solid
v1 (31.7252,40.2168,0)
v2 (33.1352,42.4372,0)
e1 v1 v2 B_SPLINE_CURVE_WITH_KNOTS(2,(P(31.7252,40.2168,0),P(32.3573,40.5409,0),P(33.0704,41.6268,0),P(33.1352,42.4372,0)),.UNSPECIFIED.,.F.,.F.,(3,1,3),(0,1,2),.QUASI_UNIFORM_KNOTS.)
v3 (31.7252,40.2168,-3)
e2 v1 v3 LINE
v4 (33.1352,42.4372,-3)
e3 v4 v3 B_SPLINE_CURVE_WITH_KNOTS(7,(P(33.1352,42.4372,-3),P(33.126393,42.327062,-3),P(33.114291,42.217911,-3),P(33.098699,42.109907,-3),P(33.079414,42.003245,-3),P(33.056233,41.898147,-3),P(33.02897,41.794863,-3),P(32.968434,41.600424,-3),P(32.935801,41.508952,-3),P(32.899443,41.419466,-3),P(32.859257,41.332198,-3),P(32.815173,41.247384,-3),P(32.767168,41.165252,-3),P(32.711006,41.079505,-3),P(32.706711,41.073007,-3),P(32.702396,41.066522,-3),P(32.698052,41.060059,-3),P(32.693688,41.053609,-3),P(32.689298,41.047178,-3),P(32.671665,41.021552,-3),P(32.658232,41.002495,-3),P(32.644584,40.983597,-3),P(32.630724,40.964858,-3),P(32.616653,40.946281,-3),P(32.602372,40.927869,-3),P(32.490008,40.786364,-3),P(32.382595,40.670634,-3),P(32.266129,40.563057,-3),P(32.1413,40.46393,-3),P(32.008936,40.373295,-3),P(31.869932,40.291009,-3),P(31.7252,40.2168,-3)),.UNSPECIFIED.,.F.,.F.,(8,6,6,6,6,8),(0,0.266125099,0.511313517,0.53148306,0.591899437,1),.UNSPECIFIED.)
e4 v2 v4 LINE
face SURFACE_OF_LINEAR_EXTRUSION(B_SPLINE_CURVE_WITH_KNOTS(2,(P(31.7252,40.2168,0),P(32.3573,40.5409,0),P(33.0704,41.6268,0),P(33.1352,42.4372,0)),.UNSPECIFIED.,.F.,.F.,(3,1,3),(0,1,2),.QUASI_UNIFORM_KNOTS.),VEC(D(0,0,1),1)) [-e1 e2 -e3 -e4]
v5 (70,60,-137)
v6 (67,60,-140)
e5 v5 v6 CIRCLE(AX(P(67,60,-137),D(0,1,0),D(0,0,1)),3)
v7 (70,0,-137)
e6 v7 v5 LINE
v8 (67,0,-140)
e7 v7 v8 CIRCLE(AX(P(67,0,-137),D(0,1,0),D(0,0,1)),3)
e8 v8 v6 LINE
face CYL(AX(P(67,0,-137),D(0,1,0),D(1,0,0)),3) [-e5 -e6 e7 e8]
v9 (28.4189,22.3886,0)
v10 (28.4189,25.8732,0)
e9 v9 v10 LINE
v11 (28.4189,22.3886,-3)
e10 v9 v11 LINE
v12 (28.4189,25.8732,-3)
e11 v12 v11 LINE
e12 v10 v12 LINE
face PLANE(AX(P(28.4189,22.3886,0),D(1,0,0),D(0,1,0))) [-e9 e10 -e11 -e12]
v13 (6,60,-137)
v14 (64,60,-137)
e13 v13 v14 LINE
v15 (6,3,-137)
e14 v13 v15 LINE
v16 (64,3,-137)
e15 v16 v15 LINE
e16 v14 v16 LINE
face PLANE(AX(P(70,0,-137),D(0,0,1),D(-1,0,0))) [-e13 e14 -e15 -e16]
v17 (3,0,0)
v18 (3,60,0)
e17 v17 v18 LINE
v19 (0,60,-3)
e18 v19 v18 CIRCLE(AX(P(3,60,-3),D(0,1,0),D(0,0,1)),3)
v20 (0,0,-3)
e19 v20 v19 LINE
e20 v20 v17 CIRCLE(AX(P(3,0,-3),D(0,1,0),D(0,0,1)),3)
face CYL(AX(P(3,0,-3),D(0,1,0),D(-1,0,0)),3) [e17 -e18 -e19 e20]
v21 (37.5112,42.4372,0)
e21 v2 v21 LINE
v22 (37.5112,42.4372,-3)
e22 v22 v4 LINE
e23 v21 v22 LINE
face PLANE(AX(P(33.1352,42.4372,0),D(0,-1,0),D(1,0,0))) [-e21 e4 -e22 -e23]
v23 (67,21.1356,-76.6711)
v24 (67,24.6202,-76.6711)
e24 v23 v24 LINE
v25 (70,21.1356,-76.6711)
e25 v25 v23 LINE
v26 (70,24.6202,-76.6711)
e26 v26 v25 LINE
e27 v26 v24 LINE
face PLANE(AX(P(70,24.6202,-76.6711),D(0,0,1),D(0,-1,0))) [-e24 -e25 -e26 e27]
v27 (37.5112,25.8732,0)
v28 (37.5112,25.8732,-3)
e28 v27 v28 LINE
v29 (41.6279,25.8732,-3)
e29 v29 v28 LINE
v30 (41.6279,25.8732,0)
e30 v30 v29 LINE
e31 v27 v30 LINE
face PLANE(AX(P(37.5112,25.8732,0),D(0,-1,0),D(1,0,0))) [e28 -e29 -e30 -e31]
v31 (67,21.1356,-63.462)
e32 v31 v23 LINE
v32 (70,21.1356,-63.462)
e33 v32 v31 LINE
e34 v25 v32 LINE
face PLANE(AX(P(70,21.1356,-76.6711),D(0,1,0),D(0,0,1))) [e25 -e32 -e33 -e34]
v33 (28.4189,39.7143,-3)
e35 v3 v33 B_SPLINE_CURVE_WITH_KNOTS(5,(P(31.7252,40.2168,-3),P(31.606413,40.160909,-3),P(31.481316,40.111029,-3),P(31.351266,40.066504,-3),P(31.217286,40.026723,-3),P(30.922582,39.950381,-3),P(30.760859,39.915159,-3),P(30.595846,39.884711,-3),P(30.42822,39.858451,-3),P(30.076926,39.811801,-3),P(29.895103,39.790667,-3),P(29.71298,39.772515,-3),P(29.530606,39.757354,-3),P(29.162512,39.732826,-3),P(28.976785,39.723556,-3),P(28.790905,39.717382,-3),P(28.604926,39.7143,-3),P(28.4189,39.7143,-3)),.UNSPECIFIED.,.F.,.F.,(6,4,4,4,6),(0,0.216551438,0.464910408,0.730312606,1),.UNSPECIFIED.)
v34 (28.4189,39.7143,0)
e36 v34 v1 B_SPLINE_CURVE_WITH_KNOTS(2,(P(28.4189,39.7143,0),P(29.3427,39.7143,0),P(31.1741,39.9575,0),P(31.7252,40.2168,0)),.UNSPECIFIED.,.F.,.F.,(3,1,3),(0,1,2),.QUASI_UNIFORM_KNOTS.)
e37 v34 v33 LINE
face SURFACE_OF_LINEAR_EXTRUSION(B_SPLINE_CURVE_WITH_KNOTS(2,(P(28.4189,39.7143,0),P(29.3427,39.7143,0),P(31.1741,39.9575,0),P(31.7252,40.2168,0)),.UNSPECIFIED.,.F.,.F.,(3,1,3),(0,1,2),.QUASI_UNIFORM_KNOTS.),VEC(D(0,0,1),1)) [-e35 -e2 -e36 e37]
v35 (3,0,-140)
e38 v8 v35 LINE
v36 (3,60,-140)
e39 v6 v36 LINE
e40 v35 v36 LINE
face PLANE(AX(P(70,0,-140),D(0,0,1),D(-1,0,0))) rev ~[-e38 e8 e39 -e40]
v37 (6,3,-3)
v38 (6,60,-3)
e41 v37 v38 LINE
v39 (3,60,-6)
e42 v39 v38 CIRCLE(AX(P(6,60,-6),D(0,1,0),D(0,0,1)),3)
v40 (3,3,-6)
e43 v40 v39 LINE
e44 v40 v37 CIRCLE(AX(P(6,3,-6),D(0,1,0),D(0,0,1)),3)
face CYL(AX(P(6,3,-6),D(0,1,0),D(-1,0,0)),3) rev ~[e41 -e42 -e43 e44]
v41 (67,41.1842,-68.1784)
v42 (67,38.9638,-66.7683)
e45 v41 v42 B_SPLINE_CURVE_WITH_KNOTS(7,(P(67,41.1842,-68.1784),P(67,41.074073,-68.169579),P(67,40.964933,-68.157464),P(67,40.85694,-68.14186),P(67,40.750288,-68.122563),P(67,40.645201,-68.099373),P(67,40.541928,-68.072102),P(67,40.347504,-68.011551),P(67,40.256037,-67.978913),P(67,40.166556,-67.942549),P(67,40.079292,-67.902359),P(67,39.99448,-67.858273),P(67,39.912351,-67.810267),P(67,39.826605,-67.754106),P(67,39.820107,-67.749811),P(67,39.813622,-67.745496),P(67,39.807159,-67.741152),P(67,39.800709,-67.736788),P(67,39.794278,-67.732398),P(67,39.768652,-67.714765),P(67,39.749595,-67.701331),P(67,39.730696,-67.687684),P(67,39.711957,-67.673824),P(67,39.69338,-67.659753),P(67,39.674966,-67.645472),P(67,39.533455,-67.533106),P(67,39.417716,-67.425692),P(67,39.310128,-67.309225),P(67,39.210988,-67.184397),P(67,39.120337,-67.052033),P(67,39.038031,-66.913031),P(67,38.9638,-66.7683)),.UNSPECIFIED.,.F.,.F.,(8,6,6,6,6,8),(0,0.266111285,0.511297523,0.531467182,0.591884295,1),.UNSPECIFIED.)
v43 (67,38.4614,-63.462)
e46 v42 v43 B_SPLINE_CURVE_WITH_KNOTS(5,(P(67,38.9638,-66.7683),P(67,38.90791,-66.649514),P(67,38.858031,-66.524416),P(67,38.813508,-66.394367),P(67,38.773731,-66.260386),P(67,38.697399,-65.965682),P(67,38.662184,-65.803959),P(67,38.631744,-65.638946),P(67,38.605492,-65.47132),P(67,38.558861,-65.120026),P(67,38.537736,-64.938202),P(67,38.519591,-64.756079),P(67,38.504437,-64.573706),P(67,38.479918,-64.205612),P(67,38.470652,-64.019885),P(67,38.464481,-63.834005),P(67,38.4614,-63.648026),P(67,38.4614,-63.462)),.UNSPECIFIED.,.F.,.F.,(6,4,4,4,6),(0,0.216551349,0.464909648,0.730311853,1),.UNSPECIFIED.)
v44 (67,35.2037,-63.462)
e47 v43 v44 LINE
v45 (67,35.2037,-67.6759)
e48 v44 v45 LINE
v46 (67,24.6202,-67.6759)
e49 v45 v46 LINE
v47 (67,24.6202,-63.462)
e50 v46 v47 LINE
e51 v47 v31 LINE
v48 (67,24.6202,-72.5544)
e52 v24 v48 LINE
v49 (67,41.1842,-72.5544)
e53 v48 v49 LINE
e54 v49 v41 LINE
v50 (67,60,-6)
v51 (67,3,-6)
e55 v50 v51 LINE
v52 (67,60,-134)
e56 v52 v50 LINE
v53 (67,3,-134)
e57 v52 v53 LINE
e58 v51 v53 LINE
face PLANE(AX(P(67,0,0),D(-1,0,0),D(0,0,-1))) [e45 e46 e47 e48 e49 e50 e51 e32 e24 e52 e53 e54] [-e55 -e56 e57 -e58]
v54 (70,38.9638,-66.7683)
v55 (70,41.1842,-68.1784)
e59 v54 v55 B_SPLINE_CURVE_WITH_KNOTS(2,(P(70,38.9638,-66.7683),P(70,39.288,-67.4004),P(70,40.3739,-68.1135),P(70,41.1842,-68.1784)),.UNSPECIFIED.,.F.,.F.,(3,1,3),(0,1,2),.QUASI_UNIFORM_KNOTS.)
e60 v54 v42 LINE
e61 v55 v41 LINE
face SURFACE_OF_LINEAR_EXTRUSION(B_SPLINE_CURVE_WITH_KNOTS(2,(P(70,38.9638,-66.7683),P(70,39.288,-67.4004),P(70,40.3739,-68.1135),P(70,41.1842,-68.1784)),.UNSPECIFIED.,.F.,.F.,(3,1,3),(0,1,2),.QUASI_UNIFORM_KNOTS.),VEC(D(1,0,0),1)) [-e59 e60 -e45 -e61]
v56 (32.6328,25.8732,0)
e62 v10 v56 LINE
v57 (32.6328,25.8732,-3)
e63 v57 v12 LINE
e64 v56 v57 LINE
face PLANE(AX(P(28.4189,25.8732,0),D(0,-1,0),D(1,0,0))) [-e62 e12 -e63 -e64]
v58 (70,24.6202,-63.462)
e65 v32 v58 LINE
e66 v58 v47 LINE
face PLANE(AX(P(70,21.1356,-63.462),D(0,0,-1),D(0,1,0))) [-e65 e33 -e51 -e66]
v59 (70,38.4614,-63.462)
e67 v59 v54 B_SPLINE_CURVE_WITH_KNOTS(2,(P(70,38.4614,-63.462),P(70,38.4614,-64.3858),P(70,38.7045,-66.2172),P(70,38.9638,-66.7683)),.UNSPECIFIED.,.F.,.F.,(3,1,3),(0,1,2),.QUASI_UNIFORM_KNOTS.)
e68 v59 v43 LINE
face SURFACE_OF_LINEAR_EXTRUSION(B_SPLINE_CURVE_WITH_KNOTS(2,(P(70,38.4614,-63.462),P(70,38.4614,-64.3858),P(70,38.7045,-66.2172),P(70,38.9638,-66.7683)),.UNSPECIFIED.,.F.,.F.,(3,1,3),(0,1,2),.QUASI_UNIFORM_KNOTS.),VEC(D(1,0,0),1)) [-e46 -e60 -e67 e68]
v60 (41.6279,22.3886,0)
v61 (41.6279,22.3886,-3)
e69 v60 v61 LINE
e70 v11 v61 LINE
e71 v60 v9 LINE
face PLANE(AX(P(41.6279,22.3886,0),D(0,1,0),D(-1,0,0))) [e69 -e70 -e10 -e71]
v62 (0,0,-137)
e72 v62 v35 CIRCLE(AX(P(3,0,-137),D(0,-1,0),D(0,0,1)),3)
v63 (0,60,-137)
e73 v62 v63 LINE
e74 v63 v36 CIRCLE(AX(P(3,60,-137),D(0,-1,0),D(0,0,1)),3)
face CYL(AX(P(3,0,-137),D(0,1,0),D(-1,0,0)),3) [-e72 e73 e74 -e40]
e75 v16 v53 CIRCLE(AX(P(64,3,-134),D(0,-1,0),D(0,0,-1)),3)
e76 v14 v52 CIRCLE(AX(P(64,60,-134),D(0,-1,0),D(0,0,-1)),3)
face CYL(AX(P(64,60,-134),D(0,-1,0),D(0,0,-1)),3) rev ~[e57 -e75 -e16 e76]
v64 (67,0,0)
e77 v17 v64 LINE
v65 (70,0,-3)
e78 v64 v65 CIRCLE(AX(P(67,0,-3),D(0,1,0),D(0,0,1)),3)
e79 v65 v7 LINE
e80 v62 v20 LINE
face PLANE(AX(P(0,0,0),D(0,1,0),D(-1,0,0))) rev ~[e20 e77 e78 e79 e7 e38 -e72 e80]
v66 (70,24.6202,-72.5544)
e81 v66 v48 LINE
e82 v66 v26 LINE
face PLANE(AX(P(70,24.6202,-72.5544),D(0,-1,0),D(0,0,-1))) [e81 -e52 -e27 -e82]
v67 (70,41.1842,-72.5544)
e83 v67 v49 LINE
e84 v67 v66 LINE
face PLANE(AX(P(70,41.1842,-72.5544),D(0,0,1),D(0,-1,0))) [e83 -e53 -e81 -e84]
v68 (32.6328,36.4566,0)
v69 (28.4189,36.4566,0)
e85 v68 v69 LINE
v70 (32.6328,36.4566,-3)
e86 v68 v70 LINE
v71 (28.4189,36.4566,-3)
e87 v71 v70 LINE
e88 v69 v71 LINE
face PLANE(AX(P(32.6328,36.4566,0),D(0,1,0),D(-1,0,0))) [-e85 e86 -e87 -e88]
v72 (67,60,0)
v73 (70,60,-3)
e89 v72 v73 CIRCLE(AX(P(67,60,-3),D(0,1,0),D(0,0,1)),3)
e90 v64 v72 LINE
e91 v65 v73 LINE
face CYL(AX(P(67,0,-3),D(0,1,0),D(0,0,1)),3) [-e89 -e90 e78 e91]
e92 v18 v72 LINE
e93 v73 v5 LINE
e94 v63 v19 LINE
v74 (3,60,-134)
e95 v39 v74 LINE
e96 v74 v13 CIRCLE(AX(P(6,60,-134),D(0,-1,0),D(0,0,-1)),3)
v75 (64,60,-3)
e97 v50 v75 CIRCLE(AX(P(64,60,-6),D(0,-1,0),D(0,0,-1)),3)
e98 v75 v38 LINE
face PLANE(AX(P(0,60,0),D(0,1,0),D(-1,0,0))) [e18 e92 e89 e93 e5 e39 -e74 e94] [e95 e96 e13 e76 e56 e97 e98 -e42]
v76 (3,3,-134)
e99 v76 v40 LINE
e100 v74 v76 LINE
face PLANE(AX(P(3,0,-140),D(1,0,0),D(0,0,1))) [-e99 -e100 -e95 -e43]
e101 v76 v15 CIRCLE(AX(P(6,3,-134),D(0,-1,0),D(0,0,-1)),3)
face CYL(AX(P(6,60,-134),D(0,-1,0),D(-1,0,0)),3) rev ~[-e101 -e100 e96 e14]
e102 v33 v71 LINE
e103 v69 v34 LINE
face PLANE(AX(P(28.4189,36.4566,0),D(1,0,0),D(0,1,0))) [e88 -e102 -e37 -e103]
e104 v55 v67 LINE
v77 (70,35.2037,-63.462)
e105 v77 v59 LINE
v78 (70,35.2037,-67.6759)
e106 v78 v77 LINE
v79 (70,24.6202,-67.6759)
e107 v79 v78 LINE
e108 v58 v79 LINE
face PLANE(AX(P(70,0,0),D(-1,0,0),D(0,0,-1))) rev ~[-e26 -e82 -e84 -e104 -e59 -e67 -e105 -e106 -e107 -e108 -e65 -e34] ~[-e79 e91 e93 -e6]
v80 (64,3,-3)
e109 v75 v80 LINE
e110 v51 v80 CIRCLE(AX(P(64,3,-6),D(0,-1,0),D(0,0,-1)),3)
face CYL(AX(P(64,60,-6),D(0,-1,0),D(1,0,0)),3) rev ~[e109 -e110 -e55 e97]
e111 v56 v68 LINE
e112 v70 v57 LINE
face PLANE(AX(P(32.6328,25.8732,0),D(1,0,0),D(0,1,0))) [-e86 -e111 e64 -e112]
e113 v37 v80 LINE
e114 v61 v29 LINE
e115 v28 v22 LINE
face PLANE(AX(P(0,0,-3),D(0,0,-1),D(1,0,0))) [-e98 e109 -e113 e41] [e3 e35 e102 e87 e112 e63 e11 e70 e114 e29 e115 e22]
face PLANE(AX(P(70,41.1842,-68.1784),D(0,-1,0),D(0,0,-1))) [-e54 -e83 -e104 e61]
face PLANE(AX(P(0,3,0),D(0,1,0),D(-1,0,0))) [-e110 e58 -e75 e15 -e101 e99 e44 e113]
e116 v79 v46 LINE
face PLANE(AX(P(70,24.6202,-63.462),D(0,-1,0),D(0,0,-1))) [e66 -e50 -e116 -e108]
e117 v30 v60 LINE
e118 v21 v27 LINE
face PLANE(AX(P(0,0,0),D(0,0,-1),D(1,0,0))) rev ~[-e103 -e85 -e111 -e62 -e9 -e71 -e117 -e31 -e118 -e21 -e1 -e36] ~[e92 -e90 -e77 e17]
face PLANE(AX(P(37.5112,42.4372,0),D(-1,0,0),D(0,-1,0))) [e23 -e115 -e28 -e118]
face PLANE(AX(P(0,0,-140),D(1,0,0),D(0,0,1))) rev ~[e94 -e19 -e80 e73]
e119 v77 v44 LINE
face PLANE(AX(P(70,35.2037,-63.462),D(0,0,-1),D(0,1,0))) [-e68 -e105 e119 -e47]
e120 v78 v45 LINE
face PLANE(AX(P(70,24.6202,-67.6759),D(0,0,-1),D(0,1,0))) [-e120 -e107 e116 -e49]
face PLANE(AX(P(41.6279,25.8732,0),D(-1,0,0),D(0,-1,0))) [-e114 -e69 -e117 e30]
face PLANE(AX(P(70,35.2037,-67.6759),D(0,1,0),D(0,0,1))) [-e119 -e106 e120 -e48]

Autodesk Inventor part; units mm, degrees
ref_plane "YZ Plane" through (0, 0, 0) normal (1, 0, 0) x (0, 1, 0)
ref_plane "XZ Plane" through (0, 0, 0) normal (0, 1, 0) x (-1, 0, 0)
ref_plane "XY Plane" through (0, 0, 0) normal (0, 0, 1) x (1, 0, 0)
sketch "Эскиз1" plane through (0, 0, 0) normal (0, 1, 0) x (-1, 0, 0)
  line L0 (0, 0) -> (-70, 0)
  line L1 (-70, 0) -> (-70, -140)
  line L2 (-70, -140) -> (0, -140)
  line L3 (0, -140) -> (0, 0)
  dimension "d0" = 70
  dimension "d1" = 140
extrude "Выдавливание1" add sketch "Эскиз1" along normal blind 60
shell "Оболочка1" thickness 3 removed faces 1 at (46.6667, 60, -93.3333)
sketch "Эскиз2" plane through (70, 0, 0) normal (1, 0, 0) x (0, 0, -1)
  line L0 (0, 60) -> (140, 60) projected
  line L1 (60.8364, 41.1842) -> (78.3566, 41.1842) construction
  line L2 (78.3566, 41.1842) -> (78.3566, 21.1356) construction
  line L3 (78.3566, 21.1356) -> (60.8364, 21.1356) construction
  line L4 (60.8364, 21.1356) -> (60.8364, 41.1842) construction
  line L5 (76.6711, 21.1356) -> (63.462, 21.1356)
  line L6 (63.462, 21.1356) -> (63.462, 24.6202)
  line L7 (63.462, 24.6202) -> (67.6759, 24.6202)
  line L8 (67.6759, 24.6202) -> (67.6759, 35.2037)
  line L9 (67.6759, 35.2037) -> (63.462, 35.2037)
  line L10 (63.462, 35.2037) -> (63.462, 38.4614)
  spline S0 degree 2 poles (63.462, 38.4614) (64.3858, 38.4614) (66.2172, 38.7045) (66.7683, 38.9638) knots 0 0 0 1 2 2 2
  spline S1 degree 2 poles (66.7683, 38.9638) (67.4004, 39.288) (68.1135, 40.3739) (68.1784, 41.1842) knots 0 0 0 1 2 2 2
  line L11 (68.1784, 41.1842) -> (72.5544, 41.1842)
  line L12 (72.5544, 41.1842) -> (72.5544, 24.6202)
  line L13 (72.5544, 24.6202) -> (76.6711, 24.6202)
  line L14 (76.6711, 24.6202) -> (76.6711, 21.1356)
  point P0 (0, 0)
  point P1 (70, 30.2829)
extrude "Выдавливание2" cut sketch "Эскиз2" against normal blind 12
sketch "Эскиз3" plane through (0, 0, 0) normal (0, 0, 1) x (1, 0, 0)
  line L0 (0, 60) -> (70, 60) projected
  line L1 (25.7932, 42.4372) -> (43.3135, 42.4372) construction
  line L2 (43.3135, 42.4372) -> (43.3135, 22.3886) construction
  line L3 (43.3135, 22.3886) -> (25.7932, 22.3886) construction
  line L4 (25.7932, 22.3886) -> (25.7932, 42.4372) construction
  line L5 (41.6279, 22.3886) -> (28.4189, 22.3886)
  line L6 (28.4189, 22.3886) -> (28.4189, 25.8732)
  line L7 (28.4189, 25.8732) -> (32.6328, 25.8732)
  line L8 (32.6328, 25.8732) -> (32.6328, 36.4566)
  line L9 (32.6328, 36.4566) -> (28.4189, 36.4566)
  line L10 (28.4189, 36.4566) -> (28.4189, 39.7143)
  spline S0 degree 2 poles (28.4189, 39.7143) (29.3427, 39.7143) (31.1741, 39.9575) (31.7252, 40.2168) knots 0 0 0 1 2 2 2
  spline S1 degree 2 poles (31.7252, 40.2168) (32.3573, 40.5409) (33.0704, 41.6268) (33.1352, 42.4372) knots 0 0 0 1 2 2 2
  line L11 (33.1352, 42.4372) -> (37.5112, 42.4372)
  line L12 (37.5112, 42.4372) -> (37.5112, 25.8732)
  line L13 (37.5112, 25.8732) -> (41.6279, 25.8732)
  line L14 (41.6279, 25.8732) -> (41.6279, 22.3886)
  point P0 (0, 0)
  point P1 (35, 31.2439)
extrude "Выдавливание3" cut sketch "Эскиз3" against normal blind 12
fillet "Сопряжение1" radius 3 4 edges at (3, 31.5, -3) (67, 31.5, -3) (3, 31.5, -137) (67, 31.5, -137)
fillet "Сопряжение2" radius 3 4 edges at (0, 30, -140) (0, 30, 0) (70, 30, -140) (70, 30, 0)
properties part number "Контейнер 1"
